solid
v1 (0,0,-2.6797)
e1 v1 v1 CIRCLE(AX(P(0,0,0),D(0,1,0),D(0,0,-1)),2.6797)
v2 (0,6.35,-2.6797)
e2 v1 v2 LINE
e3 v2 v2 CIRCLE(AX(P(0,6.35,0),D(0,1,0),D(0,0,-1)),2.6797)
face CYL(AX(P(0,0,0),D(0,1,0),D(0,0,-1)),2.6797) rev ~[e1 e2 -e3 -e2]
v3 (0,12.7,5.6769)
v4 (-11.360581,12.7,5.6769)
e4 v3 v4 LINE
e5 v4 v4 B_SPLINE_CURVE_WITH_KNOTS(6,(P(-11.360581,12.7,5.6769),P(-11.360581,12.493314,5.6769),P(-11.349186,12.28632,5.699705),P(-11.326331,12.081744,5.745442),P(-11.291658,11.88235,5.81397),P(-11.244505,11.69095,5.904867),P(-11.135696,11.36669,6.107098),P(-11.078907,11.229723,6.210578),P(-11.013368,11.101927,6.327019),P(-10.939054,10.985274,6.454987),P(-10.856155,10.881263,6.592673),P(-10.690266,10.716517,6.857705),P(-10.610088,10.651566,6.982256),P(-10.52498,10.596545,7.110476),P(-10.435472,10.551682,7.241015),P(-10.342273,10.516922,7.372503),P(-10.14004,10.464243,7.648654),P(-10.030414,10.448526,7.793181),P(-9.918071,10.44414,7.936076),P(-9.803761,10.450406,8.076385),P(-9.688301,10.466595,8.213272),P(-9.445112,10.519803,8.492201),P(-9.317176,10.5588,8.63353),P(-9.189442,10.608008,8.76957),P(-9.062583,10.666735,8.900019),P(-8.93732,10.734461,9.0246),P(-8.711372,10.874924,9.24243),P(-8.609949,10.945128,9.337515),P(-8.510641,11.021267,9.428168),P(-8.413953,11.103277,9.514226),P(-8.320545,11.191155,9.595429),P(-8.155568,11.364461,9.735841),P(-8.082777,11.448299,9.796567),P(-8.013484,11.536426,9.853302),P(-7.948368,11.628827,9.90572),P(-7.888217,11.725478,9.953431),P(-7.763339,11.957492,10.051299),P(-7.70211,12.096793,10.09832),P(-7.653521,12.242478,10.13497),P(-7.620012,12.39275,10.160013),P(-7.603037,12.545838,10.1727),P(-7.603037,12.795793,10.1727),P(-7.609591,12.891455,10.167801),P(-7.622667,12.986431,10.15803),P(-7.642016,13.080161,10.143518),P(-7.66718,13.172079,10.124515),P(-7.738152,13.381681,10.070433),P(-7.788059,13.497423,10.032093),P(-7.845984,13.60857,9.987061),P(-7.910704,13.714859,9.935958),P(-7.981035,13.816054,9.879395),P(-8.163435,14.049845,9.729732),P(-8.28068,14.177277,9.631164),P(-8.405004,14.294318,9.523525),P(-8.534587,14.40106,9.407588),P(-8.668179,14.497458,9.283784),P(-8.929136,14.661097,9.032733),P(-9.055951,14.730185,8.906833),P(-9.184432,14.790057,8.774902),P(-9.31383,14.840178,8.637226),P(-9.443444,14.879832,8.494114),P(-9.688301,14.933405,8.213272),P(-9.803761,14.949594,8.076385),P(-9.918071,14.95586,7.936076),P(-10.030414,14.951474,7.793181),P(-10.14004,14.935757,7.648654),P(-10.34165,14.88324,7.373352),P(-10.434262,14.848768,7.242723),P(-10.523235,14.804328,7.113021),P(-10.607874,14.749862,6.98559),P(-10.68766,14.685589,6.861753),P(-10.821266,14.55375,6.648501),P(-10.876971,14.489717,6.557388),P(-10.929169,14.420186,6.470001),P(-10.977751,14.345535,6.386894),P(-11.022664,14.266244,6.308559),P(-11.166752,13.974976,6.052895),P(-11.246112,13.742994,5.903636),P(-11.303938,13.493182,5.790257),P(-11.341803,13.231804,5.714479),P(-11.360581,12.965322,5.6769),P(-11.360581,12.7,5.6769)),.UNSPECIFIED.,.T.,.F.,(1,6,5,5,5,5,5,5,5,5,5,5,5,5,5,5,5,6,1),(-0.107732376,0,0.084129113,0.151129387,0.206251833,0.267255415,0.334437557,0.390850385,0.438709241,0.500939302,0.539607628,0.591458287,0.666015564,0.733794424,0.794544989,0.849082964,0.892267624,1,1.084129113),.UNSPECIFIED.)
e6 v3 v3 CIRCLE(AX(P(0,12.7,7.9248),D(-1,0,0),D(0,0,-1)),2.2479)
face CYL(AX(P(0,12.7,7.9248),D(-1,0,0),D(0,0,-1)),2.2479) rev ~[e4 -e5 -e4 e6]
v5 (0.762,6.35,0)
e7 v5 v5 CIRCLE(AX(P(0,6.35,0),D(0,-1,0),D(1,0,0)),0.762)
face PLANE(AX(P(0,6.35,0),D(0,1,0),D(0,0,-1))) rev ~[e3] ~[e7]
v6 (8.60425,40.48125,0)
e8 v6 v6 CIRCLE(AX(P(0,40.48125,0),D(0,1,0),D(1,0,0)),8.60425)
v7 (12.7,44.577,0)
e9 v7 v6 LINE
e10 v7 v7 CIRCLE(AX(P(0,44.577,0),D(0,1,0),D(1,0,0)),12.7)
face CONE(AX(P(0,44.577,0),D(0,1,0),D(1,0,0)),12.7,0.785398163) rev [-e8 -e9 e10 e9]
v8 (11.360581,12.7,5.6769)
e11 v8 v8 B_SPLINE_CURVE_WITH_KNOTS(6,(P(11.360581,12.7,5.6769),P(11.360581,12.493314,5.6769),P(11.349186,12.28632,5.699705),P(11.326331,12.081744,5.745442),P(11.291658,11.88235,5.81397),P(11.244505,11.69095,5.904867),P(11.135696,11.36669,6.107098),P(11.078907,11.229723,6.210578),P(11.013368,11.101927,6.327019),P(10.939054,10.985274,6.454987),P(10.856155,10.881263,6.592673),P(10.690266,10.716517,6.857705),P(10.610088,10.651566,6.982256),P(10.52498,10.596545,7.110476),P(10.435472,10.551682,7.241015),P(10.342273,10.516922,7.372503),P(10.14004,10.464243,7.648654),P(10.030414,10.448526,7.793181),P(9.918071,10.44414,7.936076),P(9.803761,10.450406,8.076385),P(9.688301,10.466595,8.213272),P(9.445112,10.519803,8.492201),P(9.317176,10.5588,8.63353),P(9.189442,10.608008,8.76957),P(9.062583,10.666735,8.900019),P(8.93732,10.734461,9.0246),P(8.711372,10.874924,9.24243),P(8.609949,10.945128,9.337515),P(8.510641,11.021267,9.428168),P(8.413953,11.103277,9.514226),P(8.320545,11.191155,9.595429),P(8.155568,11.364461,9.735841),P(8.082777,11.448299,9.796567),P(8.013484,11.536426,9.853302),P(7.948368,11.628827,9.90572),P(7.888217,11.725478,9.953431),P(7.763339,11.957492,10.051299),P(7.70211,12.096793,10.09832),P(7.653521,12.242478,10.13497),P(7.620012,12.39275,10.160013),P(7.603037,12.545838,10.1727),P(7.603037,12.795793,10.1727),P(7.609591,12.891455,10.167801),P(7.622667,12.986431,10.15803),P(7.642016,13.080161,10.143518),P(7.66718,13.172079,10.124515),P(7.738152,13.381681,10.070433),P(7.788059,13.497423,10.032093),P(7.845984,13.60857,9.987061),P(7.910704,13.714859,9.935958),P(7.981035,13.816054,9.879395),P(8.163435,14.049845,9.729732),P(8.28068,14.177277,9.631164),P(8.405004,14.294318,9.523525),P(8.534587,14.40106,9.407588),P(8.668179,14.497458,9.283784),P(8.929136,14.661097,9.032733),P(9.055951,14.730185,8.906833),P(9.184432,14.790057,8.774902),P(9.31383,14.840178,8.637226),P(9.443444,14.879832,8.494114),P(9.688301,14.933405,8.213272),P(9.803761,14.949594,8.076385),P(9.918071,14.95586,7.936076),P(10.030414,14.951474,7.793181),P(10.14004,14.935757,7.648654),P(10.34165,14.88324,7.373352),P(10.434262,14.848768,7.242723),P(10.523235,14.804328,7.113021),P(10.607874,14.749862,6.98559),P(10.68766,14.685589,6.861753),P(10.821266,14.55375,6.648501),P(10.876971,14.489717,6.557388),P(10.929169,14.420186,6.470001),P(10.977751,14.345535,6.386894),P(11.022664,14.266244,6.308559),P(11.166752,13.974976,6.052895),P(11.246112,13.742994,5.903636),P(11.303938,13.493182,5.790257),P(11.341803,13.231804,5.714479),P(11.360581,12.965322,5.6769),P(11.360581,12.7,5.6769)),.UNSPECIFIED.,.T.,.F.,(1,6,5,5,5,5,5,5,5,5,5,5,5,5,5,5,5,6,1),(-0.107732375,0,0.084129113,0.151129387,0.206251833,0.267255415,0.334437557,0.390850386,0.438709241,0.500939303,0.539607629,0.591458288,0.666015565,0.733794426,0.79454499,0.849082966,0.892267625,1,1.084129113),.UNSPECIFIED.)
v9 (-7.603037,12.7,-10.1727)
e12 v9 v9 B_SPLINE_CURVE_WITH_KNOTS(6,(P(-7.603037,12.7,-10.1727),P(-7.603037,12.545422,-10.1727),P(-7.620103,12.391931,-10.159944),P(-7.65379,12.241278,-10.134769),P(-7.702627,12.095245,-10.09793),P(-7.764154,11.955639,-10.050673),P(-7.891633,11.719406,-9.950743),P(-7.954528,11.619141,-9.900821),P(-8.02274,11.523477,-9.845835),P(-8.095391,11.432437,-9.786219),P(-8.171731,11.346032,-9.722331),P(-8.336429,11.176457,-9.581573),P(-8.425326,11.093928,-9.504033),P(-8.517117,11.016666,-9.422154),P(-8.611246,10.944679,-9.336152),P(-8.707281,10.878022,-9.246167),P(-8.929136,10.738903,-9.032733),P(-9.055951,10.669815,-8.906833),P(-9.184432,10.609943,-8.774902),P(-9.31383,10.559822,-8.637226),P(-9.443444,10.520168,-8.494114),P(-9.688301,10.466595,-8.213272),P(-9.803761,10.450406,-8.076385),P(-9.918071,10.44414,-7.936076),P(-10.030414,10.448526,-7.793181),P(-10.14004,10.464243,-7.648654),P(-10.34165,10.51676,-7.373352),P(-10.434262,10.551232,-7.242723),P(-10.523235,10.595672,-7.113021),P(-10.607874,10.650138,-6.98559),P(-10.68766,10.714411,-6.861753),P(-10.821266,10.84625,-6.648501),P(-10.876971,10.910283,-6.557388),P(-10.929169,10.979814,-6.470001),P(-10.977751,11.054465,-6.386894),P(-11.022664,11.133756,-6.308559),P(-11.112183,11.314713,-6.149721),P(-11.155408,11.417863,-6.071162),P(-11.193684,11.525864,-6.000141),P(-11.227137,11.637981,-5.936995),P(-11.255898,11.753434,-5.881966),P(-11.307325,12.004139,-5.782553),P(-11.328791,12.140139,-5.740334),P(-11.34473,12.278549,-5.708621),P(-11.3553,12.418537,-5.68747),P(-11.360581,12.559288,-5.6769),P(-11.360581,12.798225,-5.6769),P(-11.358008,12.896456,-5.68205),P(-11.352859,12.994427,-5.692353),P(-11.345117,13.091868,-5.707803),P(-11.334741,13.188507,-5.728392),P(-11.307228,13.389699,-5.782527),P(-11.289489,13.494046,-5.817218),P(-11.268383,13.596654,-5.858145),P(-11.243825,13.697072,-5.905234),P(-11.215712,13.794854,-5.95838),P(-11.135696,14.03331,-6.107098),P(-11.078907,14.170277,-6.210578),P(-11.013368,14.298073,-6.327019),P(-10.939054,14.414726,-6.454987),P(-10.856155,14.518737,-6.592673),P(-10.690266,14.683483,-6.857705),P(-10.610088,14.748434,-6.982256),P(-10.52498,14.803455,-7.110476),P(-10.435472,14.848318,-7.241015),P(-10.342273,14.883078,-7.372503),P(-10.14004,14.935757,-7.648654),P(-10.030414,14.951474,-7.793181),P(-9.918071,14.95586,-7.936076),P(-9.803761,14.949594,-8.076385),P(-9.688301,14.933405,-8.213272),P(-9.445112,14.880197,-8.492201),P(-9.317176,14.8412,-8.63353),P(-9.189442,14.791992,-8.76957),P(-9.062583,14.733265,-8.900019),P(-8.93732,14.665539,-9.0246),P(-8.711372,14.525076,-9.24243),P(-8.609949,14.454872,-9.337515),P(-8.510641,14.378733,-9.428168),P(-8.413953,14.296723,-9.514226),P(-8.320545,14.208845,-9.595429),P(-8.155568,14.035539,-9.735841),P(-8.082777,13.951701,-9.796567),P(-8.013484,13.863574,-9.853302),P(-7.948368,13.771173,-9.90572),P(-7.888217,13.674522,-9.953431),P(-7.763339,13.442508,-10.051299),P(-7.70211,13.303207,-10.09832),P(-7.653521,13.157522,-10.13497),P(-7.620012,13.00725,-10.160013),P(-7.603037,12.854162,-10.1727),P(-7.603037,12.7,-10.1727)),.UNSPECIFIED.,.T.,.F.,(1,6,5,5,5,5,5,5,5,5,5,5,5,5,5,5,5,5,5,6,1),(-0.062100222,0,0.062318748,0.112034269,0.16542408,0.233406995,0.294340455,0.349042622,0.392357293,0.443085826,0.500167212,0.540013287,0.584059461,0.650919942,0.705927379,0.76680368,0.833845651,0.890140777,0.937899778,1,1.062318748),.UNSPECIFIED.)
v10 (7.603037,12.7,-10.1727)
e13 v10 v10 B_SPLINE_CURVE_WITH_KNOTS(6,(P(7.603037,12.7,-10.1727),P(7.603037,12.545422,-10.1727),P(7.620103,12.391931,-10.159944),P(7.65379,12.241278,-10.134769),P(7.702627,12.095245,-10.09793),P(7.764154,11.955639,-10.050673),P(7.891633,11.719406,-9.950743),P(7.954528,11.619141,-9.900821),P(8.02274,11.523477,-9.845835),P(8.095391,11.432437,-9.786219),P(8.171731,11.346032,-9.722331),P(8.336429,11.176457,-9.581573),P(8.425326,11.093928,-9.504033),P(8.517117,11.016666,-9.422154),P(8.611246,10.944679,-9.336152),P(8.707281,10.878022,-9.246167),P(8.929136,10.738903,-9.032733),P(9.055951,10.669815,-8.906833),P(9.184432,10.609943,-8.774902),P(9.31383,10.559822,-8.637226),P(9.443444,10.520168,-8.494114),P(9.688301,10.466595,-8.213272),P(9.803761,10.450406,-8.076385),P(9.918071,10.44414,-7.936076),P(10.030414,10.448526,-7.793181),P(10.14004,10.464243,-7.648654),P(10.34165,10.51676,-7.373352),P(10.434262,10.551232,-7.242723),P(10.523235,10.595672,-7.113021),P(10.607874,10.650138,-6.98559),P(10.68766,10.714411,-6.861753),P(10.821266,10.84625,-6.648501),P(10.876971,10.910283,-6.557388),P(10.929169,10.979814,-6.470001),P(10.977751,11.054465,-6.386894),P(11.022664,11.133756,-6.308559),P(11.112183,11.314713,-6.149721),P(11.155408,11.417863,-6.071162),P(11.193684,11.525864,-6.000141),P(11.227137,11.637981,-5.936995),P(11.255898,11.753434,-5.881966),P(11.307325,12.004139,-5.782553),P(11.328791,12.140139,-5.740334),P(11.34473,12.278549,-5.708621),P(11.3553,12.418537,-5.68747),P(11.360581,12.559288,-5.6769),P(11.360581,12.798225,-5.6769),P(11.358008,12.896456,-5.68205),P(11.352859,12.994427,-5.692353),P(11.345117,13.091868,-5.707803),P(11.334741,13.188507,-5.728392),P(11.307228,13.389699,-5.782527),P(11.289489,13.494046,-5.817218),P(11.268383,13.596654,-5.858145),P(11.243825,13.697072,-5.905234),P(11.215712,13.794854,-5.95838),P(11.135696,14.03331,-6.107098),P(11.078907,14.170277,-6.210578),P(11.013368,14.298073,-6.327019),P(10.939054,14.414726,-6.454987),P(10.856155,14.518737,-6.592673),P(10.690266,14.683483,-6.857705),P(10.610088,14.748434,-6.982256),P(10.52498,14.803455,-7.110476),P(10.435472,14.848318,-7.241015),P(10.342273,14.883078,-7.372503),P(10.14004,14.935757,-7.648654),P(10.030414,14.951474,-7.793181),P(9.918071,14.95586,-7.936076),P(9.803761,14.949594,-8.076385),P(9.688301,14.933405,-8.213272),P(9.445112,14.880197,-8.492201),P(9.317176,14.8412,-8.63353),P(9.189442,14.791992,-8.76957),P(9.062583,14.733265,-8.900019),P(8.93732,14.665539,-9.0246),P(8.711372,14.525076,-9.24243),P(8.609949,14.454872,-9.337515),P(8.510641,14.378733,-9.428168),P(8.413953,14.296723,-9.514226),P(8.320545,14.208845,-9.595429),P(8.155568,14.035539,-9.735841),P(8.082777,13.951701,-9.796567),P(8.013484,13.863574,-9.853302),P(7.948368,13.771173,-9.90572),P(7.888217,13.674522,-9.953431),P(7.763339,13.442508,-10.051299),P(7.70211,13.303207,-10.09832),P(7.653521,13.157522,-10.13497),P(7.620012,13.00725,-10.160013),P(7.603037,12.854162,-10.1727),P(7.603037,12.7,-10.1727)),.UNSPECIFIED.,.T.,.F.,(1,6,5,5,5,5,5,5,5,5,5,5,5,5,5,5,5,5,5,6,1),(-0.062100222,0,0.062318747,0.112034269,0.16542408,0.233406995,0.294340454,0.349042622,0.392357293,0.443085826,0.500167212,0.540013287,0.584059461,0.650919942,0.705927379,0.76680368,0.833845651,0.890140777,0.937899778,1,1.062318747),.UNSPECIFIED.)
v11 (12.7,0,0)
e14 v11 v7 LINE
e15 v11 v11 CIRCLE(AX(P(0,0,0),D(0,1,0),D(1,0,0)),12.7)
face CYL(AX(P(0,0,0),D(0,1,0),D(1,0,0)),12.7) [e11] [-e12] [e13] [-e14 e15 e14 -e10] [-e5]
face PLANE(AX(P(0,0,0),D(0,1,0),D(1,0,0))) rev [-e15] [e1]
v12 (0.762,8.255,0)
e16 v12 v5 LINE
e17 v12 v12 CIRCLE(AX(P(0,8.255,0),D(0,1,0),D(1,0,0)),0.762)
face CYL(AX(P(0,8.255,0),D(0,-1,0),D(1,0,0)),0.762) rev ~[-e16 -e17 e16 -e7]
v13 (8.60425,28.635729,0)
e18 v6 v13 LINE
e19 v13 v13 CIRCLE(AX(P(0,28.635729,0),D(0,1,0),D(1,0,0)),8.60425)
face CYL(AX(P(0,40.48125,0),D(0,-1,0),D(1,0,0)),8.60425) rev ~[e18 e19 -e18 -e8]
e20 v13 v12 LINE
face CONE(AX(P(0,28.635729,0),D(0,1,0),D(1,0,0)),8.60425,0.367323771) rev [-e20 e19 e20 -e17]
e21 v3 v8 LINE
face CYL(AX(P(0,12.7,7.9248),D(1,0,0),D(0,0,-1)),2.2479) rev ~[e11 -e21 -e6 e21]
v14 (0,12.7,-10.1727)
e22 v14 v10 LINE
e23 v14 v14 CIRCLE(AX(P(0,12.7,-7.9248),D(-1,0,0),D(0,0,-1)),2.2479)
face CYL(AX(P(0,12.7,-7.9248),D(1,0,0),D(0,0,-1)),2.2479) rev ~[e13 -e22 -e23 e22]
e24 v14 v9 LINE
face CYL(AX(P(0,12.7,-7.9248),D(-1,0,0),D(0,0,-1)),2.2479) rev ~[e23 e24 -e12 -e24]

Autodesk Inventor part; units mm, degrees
ref_plane "YZ Plane" through (0, 0, 0) normal (1, 0, 0) x (0, 1, 0)
ref_plane "XZ Plane" through (0, 0, 0) normal (0, 1, 0) x (-1, 0, 0)
ref_plane "XY Plane" through (0, 0, 0) normal (0, 0, 1) x (1, 0, 0)
sketch "Sketch1" plane through (0, 0, 0) normal (0, 0, 1) x (1, 0, 0)
  line L0 (0, 0) -> (6.223, 0)
  line L1 (0, 0) -> (6.223, 0) construction
  line L2 (6.223, 0) -> (6.223, 38.1)
  line L3 (0, 0) -> (0.762, 0)
  line L4 (0.762, 0) -> (0.762, 8.255)
  line L5 (0.762, 8.255) -> (6.223, 28.635729)
  line L6 (6.223, 28.635729) -> (6.223, 38.1)
  line L7 (0, 0) -> (12.7, 0)
  line L8 (0, -8.9154) -> (0, 53.4924)
  line L9 (6.223, 38.1) -> (12.20332, 44.08032)
  line L10 (6.223, 38.1) -> (14.68045, 38.1) construction
  line L11 (12.20332, 44.08032) -> (12.7, 0)
  line L12 (12.7, 0) -> (12.7, 44.577)
  line L13 (12.7, 44.577) -> (6.223, 38.1)
  line L14 (6.223, 38.1) -> (0, 38.1)
  line L15 (0, 8.255) -> (0.762, 8.255)
  line L16 (0, 8.255) -> (0, 38.1)
  line L17 (6.223, 28.635729) -> (0, 28.635729)
  line L18 (0, 28.635729) -> (8.60425, 28.635729)
  line L19 (8.60425, 28.635729) -> (0.762, 8.255)
  line L20 (8.60425, 28.635729) -> (8.60425, 40.48125)
  dimension "d0" = 6.223
  dimension "d1" = 0
  dimension "d2" = 38.1
  dimension "d3" = 90
  dimension "d4" = 0.762
  dimension "d5" = 8.255
  dimension "d6" = 165
  dimension "d7" = 12.7
  dimension "d18" = 45
  dimension "d58" = 8.60425
sketch "Sketch1 outline for Revolution1" plane through (0, 0, 0) normal (0, 0, 1) x (1, 0, 0)
  line L0 (8.60425, 40.48125) -> (8.60425, 28.635729)
  line L1 (8.60425, 28.635729) -> (0.762, 8.255)
  line L2 (0.762, 8.255) -> (0.762, 0)
  line L3 (0.762, 0) -> (12.7, 0)
  line L4 (12.7, 0) -> (12.7, 44.577)
  line L5 (12.7, 44.577) -> (8.60425, 40.48125)
revolve "Revolution1" add sketch "Sketch1 outline for Revolution1" angle 360 about axis through (0, -10, 0) along (0, 1, 0)
sketch "Sketch3" plane through (0, 0, 0) normal (0, -1, 0) x (1, 0, 0)
  point P0 (0, 0)
  point P1 (0, 0)
hole "Hole2" at (0, 0, 0) direction (0, 1, 0) diameter 5.3594 depth 6.35 thread size "1/4-28 UNF" class "2B" standard "ANSI Unified Screw Threads"
sketch "Sketch4" plane through (0, 0, 0) normal (1, 0, 0) x (0, 1, 0)
  line L0 (0, 12.7) -> (0, -12.7) projected
  line L1 (0, 12.7) -> (0, 7.9248)
  line L2 (0, 7.9248) -> (12.7, 7.9248)
  line L3 (0, -12.7) -> (0, -7.9248)
  line L4 (0, -7.9248) -> (12.7, -7.9248)
  point P0 (0, 0)
  dimension "d28" = 4.7752
  dimension "d29" = 12.7
  dimension "d30" = 4.7752
  dimension "d31" = 12.7
  dimension "d32" = 90
hole "Hole3" at (0, 12.7, 7.9248) at (0, 12.7, -7.9248) direction (-1, 0, 0) diameter 4.4958 end through all clearance for "Socket Head Cap Screw" size "#8" standard "Ansi Unified Screw Threads"
mirror "Mirror1" about plane through (0, 0, 0) normal (1, 0, 0) of "Hole3"
equation "\"d47\" = 55deg"
equation "\"Sketch5_Pitch\" = 0.90714"
properties part number "catch vertical seal-tighttol-thread"
